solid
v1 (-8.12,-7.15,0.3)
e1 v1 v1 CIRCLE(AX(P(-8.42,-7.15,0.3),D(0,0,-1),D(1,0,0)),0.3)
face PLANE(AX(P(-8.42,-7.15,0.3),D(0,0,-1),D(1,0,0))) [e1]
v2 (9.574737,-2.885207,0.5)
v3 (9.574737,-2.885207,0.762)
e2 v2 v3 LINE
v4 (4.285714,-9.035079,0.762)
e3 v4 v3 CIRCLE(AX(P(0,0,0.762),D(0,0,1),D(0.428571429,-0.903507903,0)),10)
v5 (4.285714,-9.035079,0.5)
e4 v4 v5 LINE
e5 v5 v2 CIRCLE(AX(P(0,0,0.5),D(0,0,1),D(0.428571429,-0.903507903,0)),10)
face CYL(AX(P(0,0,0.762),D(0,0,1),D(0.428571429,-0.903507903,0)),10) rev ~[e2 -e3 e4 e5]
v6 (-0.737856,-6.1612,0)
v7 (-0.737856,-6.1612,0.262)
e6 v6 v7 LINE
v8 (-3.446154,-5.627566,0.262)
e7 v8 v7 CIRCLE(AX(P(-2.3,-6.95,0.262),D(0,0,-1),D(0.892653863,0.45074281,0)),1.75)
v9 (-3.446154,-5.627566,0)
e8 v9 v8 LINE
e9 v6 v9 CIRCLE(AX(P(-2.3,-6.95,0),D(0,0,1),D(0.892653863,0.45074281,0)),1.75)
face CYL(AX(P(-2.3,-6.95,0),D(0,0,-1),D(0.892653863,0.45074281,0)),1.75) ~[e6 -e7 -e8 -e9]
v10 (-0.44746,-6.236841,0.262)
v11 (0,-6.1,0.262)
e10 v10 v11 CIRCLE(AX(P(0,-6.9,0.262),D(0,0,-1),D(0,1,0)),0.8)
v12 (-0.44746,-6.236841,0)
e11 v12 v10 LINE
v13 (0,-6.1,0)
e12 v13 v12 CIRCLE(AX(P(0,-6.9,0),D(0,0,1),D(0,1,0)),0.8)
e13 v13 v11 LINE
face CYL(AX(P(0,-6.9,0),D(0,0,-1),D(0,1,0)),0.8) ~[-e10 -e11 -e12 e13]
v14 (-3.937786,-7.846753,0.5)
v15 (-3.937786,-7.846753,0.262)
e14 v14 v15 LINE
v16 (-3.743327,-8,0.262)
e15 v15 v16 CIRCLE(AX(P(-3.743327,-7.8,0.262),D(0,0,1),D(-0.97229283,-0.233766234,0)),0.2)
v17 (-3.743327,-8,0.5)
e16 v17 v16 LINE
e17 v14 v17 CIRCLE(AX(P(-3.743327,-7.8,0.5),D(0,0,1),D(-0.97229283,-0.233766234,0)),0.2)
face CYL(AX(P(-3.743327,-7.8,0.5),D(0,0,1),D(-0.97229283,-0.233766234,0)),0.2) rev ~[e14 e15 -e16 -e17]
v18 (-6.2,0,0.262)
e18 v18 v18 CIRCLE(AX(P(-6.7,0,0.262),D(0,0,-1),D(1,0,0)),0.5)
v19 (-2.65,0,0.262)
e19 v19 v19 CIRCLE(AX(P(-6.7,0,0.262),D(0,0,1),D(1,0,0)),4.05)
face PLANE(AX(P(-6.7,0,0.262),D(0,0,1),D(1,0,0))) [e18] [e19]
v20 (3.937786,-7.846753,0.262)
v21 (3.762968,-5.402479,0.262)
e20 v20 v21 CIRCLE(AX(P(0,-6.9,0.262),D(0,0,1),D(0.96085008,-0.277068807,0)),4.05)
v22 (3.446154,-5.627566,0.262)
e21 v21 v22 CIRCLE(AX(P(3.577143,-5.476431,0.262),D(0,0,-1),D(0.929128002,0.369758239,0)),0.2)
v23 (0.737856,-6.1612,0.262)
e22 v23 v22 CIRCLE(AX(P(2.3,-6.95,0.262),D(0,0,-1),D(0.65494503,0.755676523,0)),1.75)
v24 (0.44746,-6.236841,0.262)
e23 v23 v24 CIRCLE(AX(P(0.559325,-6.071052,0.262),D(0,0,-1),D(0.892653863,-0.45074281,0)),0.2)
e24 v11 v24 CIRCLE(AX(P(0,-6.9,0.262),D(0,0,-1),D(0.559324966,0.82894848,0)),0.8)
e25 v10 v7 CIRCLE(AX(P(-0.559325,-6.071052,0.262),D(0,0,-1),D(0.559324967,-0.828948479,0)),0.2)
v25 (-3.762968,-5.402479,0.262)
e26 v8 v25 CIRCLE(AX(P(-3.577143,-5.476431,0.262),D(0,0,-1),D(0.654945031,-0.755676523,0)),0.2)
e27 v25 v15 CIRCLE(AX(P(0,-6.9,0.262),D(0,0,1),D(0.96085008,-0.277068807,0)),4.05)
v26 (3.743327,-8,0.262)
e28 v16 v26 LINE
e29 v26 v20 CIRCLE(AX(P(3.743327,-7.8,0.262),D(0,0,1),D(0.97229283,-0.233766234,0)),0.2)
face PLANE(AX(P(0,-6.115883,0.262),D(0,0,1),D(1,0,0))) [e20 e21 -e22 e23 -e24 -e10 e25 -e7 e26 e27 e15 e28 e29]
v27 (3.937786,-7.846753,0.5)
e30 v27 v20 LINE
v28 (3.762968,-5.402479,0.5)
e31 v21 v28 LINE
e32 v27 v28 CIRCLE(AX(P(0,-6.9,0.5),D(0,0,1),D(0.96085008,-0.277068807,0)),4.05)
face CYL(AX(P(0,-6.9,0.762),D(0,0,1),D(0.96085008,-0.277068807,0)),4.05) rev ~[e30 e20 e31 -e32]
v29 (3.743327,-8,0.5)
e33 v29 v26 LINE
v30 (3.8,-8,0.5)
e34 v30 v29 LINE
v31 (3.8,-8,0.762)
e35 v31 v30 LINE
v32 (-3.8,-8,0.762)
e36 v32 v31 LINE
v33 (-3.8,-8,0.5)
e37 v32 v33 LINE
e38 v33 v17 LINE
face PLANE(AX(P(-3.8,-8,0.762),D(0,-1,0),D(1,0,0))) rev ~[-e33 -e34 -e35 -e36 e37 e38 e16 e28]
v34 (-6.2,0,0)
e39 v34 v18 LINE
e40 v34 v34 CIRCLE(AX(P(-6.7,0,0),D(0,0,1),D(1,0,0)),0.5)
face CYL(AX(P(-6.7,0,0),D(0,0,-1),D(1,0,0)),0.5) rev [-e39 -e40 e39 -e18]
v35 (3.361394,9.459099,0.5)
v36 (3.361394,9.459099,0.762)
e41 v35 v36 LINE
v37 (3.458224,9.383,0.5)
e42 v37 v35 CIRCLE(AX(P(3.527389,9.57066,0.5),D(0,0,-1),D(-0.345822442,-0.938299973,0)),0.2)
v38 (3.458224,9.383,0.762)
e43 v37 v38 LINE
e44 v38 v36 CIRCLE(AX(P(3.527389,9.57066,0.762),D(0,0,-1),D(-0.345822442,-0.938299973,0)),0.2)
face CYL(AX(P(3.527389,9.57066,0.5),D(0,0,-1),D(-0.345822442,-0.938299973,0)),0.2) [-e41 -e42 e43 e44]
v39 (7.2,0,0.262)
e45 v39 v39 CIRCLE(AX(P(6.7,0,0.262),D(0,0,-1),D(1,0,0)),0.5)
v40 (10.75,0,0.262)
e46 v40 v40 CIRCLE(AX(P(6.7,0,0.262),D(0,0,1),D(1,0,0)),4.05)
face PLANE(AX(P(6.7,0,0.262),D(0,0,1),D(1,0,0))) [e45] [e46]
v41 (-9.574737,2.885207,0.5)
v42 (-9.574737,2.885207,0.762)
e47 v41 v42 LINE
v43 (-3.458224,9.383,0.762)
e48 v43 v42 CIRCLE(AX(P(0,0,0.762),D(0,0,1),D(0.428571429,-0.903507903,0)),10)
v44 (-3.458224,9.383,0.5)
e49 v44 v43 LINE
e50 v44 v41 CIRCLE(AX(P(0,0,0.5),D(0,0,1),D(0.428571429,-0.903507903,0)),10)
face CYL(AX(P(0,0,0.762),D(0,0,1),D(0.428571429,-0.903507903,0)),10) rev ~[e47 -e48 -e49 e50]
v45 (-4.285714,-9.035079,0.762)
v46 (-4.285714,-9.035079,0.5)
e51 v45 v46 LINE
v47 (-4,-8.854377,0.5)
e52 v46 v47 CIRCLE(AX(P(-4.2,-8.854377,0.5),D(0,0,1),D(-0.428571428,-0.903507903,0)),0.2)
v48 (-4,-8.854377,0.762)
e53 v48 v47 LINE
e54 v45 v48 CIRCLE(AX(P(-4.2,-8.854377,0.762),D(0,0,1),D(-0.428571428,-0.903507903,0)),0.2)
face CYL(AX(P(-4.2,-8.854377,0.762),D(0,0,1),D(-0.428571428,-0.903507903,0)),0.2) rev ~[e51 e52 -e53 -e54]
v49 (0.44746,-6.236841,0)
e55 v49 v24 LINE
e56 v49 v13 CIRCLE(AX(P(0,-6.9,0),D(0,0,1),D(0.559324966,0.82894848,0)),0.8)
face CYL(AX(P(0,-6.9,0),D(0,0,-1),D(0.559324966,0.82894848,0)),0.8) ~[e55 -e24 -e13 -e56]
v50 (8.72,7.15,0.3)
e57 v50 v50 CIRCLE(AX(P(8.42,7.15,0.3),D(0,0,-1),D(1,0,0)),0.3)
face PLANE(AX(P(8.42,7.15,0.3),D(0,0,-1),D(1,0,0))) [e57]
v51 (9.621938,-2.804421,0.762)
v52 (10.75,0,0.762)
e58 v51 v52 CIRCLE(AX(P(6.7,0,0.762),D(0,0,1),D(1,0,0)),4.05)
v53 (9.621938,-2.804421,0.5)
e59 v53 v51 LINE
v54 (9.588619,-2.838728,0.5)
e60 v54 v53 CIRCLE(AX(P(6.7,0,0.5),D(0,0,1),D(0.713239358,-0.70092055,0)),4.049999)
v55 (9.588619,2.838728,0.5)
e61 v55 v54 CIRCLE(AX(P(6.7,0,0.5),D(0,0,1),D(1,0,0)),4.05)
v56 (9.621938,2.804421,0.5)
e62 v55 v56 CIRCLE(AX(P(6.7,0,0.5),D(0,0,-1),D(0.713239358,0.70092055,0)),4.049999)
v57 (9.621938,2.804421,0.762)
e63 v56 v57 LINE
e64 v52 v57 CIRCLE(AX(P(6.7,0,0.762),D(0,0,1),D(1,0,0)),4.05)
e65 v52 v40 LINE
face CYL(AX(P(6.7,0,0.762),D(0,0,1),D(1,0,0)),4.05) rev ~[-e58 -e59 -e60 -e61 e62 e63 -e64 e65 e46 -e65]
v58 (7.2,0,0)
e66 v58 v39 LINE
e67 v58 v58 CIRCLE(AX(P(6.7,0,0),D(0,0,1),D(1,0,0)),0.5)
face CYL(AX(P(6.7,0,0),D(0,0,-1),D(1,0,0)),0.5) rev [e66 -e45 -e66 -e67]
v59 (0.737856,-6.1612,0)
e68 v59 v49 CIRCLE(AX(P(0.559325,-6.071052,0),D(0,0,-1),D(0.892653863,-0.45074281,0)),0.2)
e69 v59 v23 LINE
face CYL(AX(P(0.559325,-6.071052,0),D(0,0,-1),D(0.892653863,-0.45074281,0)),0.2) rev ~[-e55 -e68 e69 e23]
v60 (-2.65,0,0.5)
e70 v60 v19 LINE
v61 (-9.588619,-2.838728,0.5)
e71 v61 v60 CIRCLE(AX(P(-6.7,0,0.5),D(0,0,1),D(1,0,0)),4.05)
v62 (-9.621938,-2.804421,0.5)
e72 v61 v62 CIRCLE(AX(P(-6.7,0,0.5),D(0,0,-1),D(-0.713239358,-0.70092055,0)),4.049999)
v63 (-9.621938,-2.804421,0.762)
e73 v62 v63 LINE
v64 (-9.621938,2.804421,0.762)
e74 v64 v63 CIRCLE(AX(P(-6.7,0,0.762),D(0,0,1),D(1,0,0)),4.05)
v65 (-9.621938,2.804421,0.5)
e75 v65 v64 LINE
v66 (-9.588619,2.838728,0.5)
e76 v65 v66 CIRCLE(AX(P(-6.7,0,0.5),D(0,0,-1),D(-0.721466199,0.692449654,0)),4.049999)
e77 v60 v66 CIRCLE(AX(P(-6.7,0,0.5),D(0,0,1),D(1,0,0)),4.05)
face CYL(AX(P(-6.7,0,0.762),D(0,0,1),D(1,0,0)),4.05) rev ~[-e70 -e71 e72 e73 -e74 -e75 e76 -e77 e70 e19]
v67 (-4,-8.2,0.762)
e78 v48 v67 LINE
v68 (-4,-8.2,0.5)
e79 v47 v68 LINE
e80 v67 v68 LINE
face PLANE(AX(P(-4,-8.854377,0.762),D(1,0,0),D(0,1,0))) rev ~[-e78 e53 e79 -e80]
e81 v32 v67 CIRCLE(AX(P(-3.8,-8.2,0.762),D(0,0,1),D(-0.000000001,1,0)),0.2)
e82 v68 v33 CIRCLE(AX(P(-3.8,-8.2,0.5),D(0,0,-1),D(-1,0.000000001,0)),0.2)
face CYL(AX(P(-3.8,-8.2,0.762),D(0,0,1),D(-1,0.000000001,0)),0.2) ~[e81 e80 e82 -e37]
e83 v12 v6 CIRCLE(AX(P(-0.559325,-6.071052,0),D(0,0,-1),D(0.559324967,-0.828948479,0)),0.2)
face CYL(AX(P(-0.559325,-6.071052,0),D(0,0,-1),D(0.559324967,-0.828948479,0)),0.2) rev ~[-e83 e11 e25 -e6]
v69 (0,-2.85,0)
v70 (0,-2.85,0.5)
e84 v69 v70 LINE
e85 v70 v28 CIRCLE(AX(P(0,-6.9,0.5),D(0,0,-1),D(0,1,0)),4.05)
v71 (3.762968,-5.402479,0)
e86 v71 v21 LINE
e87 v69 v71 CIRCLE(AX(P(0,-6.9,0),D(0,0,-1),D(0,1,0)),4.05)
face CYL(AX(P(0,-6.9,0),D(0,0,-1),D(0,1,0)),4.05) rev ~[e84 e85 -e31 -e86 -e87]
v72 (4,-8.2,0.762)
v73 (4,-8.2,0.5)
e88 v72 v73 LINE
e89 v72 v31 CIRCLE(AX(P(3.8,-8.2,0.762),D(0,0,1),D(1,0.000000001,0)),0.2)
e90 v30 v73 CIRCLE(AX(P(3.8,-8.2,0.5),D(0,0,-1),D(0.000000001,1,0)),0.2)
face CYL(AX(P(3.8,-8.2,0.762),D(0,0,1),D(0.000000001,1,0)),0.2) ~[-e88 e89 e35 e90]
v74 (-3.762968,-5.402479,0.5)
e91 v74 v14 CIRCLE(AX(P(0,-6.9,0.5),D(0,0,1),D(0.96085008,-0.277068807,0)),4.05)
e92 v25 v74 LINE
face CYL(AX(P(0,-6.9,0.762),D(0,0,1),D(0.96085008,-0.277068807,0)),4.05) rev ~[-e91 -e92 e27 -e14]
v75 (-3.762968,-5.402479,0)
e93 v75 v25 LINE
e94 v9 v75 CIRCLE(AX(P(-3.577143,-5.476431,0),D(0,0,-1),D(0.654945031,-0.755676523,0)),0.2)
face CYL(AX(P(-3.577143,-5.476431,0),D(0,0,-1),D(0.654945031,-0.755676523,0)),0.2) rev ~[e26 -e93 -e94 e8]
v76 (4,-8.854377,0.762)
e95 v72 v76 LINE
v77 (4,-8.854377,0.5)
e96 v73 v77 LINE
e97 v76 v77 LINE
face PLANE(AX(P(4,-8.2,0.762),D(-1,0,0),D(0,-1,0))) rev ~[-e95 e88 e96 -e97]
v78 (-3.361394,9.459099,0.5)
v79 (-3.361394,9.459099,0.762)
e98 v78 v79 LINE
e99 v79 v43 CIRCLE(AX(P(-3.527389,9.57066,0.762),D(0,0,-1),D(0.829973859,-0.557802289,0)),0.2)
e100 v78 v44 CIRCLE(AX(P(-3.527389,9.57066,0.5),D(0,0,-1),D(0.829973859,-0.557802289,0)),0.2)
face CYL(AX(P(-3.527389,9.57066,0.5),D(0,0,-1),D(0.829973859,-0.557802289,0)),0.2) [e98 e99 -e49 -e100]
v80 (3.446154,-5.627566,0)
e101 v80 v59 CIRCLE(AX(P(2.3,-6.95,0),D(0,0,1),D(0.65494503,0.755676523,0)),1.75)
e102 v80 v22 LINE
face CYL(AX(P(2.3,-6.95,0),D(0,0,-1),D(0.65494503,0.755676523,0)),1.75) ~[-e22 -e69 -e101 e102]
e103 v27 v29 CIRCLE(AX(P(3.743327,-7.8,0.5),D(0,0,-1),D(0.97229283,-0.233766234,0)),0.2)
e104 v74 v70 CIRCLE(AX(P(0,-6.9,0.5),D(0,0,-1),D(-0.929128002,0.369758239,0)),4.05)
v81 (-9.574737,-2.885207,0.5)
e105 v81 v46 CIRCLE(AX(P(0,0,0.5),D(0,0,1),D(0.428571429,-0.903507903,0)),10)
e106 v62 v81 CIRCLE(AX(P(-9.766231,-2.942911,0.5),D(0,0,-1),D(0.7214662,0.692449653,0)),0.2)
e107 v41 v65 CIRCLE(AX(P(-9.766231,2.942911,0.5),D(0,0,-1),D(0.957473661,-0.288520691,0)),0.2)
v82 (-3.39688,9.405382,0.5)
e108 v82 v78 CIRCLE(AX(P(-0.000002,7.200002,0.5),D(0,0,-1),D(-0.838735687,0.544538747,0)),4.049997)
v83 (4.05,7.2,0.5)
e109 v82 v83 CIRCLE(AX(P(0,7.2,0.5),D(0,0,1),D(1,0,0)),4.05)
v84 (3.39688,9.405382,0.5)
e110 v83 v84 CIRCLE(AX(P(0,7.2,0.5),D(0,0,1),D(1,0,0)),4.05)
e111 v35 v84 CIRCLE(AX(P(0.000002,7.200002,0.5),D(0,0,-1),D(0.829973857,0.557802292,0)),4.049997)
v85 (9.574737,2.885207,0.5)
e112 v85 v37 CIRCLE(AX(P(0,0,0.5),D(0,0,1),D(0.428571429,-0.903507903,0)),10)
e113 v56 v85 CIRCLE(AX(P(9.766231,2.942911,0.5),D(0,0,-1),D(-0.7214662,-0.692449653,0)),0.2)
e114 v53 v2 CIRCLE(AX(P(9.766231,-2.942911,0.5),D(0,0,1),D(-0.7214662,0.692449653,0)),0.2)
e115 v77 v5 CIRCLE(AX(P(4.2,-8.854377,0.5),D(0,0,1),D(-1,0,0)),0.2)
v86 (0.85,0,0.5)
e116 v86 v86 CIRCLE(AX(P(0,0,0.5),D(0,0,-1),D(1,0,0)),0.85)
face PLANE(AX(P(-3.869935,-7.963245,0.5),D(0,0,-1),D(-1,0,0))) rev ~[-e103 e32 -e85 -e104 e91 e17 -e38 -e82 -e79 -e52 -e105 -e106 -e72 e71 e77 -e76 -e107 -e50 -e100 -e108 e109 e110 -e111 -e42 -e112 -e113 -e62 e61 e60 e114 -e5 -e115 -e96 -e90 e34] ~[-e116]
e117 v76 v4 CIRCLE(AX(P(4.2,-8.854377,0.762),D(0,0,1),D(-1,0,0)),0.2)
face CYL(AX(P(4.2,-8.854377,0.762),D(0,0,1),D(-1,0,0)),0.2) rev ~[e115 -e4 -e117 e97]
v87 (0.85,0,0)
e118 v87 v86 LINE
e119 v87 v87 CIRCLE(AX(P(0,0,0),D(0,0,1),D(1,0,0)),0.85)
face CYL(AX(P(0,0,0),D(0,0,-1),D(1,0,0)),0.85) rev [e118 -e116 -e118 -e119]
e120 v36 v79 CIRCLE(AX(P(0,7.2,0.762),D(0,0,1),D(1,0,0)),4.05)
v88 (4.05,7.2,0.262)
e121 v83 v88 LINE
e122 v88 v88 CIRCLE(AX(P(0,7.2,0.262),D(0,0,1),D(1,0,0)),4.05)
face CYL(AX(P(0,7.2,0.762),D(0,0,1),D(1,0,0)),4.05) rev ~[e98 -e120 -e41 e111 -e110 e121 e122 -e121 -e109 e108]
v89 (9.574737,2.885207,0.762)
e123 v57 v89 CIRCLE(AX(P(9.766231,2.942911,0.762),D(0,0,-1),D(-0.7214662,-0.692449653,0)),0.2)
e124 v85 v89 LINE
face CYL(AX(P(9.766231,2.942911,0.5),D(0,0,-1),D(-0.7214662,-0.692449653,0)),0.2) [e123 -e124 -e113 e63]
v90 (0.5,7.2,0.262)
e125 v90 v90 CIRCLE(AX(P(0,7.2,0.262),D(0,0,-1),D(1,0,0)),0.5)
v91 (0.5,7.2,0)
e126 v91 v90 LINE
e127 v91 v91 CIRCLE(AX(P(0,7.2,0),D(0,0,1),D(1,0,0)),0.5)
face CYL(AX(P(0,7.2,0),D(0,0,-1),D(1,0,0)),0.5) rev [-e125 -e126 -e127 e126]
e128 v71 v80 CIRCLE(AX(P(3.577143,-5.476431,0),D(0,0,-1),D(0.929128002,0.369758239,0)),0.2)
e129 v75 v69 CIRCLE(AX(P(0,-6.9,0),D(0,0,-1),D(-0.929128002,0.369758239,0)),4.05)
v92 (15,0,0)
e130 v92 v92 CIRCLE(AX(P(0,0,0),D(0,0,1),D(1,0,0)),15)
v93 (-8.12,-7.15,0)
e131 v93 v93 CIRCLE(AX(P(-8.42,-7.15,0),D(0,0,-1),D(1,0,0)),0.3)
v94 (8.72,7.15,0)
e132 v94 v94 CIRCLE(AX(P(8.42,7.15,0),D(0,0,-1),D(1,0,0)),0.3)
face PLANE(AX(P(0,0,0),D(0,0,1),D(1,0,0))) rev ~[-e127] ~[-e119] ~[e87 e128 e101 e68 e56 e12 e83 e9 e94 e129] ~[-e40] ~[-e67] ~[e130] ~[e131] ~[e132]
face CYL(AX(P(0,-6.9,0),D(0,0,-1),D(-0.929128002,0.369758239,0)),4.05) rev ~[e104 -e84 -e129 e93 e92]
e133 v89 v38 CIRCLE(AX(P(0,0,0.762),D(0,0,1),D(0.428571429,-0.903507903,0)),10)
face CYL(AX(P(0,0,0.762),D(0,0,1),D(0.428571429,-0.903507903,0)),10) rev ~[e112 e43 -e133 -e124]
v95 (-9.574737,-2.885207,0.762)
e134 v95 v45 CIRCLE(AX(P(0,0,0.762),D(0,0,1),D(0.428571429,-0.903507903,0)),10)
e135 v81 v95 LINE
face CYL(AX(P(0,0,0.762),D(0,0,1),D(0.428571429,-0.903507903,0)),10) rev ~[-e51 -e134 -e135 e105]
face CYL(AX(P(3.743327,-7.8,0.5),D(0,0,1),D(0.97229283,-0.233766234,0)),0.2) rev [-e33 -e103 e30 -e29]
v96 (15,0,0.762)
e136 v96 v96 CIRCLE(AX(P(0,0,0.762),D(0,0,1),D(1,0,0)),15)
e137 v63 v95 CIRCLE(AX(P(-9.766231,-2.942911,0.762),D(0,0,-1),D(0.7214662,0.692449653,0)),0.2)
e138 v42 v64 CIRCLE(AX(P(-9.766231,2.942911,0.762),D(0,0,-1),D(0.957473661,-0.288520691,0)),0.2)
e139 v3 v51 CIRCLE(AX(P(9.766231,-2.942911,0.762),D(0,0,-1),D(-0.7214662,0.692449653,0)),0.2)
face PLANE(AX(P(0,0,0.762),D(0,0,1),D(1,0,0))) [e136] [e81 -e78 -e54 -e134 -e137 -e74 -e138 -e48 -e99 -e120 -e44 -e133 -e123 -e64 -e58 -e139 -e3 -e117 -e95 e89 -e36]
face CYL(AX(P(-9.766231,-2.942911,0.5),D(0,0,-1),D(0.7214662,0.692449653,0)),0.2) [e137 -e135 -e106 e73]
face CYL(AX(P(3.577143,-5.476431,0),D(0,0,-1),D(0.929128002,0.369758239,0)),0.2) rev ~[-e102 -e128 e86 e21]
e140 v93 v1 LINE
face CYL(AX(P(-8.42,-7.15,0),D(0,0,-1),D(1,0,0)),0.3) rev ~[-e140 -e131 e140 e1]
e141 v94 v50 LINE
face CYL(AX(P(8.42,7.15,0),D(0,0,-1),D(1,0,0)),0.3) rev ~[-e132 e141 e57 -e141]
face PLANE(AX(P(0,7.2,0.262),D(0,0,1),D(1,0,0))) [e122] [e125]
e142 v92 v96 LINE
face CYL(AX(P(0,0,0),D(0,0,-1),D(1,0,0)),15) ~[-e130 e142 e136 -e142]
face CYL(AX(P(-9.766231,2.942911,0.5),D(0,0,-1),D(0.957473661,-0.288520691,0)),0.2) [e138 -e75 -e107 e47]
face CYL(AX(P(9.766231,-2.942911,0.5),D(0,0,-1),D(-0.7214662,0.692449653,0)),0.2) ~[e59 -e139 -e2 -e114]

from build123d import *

# Parameters (mm, degrees)
F0_R         = 15
F0_R_2       = 0.5
F0_R_3       = 0.85
F1_DEPTH     = 0.762
F3_DEPTH     = 0.262
F4_R         = 4.05
F5_DEPTH     = 0.5
F6_T4_DEPTH  = 0.6914880487
F6_T9_DEPTH  = 0.6914880487
F6_T11_DEPTH = 0.3832692911
F6_T13_DEPTH = 0.4252513356
F7_R         = 0.3
F8_DEPTH     = 0.3


# Not quite as in the source:
# - a fillet or chamfer that OpenCascade refuses, or shapes differently, is made with other operations: its cross-section is extruded or revolved along the edge and cut away or added


with BuildPart() as f1:
    # F0 (on Top) → F1 (new body)
    with BuildSketch(Plane.XY):
        Circle(F0_R)
        with BuildLine():
            ThreePointArc((-3.7629684096, -5.4024791326), (-2.2734929609, -3.548324336), (0, -2.85))
            ThreePointArc((0, -2.85), (2.2734929609, -3.548324336), (3.7629684096, -5.4024791326))
            ThreePointArc((3.7629684096, -5.4024791326), (3.6929780242, -5.6394712752), (3.4461538031, -5.6275660849))
            ThreePointArc((3.4461538031, -5.6275660849), (1.9616904878, -5.2330123256), (0.7378557396, -6.1612000827))
            ThreePointArc((0.7378557396, -6.1612000827), (0.6097380289, -6.2645935657), (0.4474599736, -6.2368412165))
            ThreePointArc((0.4474599736, -6.2368412165), (0.233958301, -6.1349748283), (0, -6.1))
            ThreePointArc((0, -6.1), (-0.233958301, -6.1349748283), (-0.4474599736, -6.2368412165))
            ThreePointArc((-0.4474599736, -6.2368412165), (-0.6097380289, -6.2645935657), (-0.7378557396, -6.1612000827))
            ThreePointArc((-0.7378557396, -6.1612000827), (-1.9616904878, -5.2330123256), (-3.4461538031, -5.6275660849))
            ThreePointArc((-3.4461538031, -5.6275660849), (-3.6929780242, -5.6394712752), (-3.7629684096, -5.4024791326))
        make_face(mode=Mode.SUBTRACT)
        with Locations((-6.7, 0)):
            Circle(F0_R_2, mode=Mode.SUBTRACT)
        Circle(F0_R_3, mode=Mode.SUBTRACT)
        with Locations((6.7, 0)):
            Circle(F0_R_2, mode=Mode.SUBTRACT)
        with Locations((0, 7.2)):
            Circle(F0_R_2, mode=Mode.SUBTRACT)
    extrude(amount=F1_DEPTH)

    # F2 (on face) → F3 (cut)
    with BuildSketch(Plane.XY.offset(0.762)):
        with BuildLine():
            ThreePointArc((4, -8.8543774485), (4.0930955032, -9.0234082994), (4.2857142857, -9.0350790291))
            ThreePointArc((4.2857142857, -9.0350790291), (0, 10), (-4.2857142857, -9.0350790291))
            ThreePointArc((-4.2857142857, -9.0350790291), (-4.0930955032, -9.0234082994), (-4, -8.8543774485))
            Line((-4, -8.8543774485), (-4, -8.2))
            ThreePointArc((-4, -8.2), (-3.9414213562, -8.0585786438), (-3.8, -8))
            Line((-3.8, -8), (0, -8))
            Line((0, -8), (3.8, -8))
            ThreePointArc((3.8, -8), (3.9414213562, -8.0585786438), (4, -8.2))
            Line((4, -8.2), (4, -8.8543774485))
        make_face()
    extrude(amount=-F3_DEPTH, mode=Mode.SUBTRACT)

    # F4 (on face) → F5 (cut)
    with BuildSketch(Plane.XY.offset(0.762)):
        with Locations((0, 7.2)):
            Circle(F4_R)
        with Locations((6.7, 0)):
            Circle(F4_R)
        with Locations((-6.7, 0)):
            Circle(F4_R)
        with BuildLine():
            ThreePointArc((3.8, -8), (3.8470411203, -8.0056108722), (3.8914428234, -8.02212867))
            ThreePointArc((3.8914428234, -8.02212867), (0, -2.85), (-3.8914428234, -8.02212867))
            ThreePointArc((-3.8914428234, -8.02212867), (-3.8470411203, -8.0056108722), (-3.8, -8))
            Line((-3.8, -8), (3.8, -8))
        make_face()
    extrude(amount=-F5_DEPTH, mode=Mode.SUBTRACT)

    # F6: fillet of radius 0.2 on 8 edges, made by hand


with BuildPart() as f6_tool2:
    # F6_s3 → F6_t4 (new body)
    with BuildSketch(Plane.XY.offset(0.5)):
        with BuildLine():
            ThreePointArc((3.9377859629, -7.8467532468), (3.8671202695, -7.9570838142), (3.7433273968, -8))
            Line((3.7433273968, -8), (3.7433273968, -8.02))
            ThreePointArc((3.7433273968, -8.02), (3.8, -8.02), (3.8822985411, -8.039915803))
            Line((3.8822985411, -8.039915803), (3.910659825, -8.0276700461))
            ThreePointArc((3.910659825, -8.0276700461), (3.9349326547, -7.9398100803), (3.9572318195, -7.8514285714))
            Line((3.9572318195, -7.8514285714), (3.9377859629, -7.8467532468))
        make_face()
    extrude(amount=-F6_T4_DEPTH)

    split(bisect_by=Plane.XY, keep=Keep.TOP)


with BuildPart() as f1_1:
    add(f1.part)

    # F6_t1: union F6_tool2
    add(f6_tool2.part)


with BuildPart() as f6_tool7:
    # F6_s8 → F6_t9 (new body)
    with BuildSketch(Plane.XY.offset(0.5)):
        with BuildLine():
            ThreePointArc((-3.9377859629, -7.8467532468), (-3.8671202695, -7.9570838142), (-3.7433273968, -8))
            Line((-3.7433273968, -8), (-3.7433273968, -8.02))
            ThreePointArc((-3.7433273968, -8.02), (-3.8, -8.02), (-3.8822985411, -8.039915803))
            Line((-3.8822985411, -8.039915803), (-3.910659825, -8.0276700461))
            ThreePointArc((-3.910659825, -8.0276700461), (-3.9349326547, -7.9398100803), (-3.9572318195, -7.8514285714))
            Line((-3.9572318195, -7.8514285714), (-3.9377859629, -7.8467532468))
        make_face()
    extrude(amount=-F6_T9_DEPTH)

    split(bisect_by=Plane.XY, keep=Keep.TOP)


with BuildPart() as f1_2:
    add(f1_1.part)

    # F6_t6: union F6_tool7
    add(f6_tool7.part)

    # F6_s12 → F6_t11 (cut)
    with BuildSketch(Plane.XY.offset(0.5)):
        with BuildLine():
            ThreePointArc((-9.5747366111, 2.8852068953), (-9.5935467273, 2.8420149313), (-9.6219381036, 2.8044211022))
            ThreePointArc((-9.6219381036, 2.8044211022), (-9.6053293925, 2.8216238447), (-9.588619403, 2.8387282266))
            ThreePointArc((-9.588619403, 2.8387282266), (-9.5817061892, 2.8619759788), (-9.5747366111, 2.8852068953))
        make_face()
        with BuildLine():
            ThreePointArc((-9.6219381036, -2.8044211022), (-9.5935467273, -2.8420149313), (-9.5747366111, -2.8852068953))
            ThreePointArc((-9.5747366111, -2.8852068953), (-9.5817061892, -2.8619759788), (-9.588619403, -2.8387282266))
            ThreePointArc((-9.588619403, -2.8387282266), (-9.6053293925, -2.8216238447), (-9.6219381036, -2.8044211022))
        make_face()
        with BuildLine():
            ThreePointArc((9.6219381036, 2.8044211022), (9.5935467273, 2.8420149313), (9.5747366111, 2.8852068953))
            ThreePointArc((9.5747366111, 2.8852068953), (9.5817061892, 2.8619759788), (9.588619403, 2.8387282266))
            ThreePointArc((9.588619403, 2.8387282266), (9.6053293925, 2.8216238447), (9.6219381036, 2.8044211022))
        make_face()
        with BuildLine():
            ThreePointArc((9.6219381036, -2.8044211022), (9.5935467273, -2.8420149313), (9.5747366111, -2.8852068953))
            ThreePointArc((9.5747366111, -2.8852068953), (9.5817061892, -2.8619759788), (9.588619403, -2.8387282266))
            ThreePointArc((9.588619403, -2.8387282266), (9.6053293925, -2.8216238447), (9.6219381036, -2.8044211022))
        make_face()
    extrude(amount=F6_T11_DEPTH, mode=Mode.SUBTRACT)

    # F6_s14 → F6_t13 (cut)
    with BuildSketch(Plane.XY.offset(0.5)):
        with BuildLine():
            ThreePointArc((3.4582244159, 9.3829997277), (3.4038059187, 9.4134107296), (3.3613941322, 9.4590992647))
            ThreePointArc((3.3613941322, 9.4590992647), (3.3792435663, 9.4323111163), (3.3968795208, 9.4053819444))
            ThreePointArc((3.3968795208, 9.4053819444), (3.427570238, 9.3942409094), (3.4582244159, 9.3829997277))
        make_face()
        with BuildLine():
            ThreePointArc((-3.3613941322, 9.4590992647), (-3.4038059187, 9.4134107296), (-3.4582244159, 9.3829997277))
            ThreePointArc((-3.4582244159, 9.3829997277), (-3.427570238, 9.3942409094), (-3.3968795208, 9.4053819444))
            ThreePointArc((-3.3968795208, 9.4053819444), (-3.3792435663, 9.4323111163), (-3.3613941322, 9.4590992647))
        make_face()
    extrude(amount=F6_T13_DEPTH, mode=Mode.SUBTRACT)

    # F7 (on face) → F8 (cut)
    with BuildSketch(Plane(origin=(0, 0, 0), x_dir=(1, 0, 0), z_dir=(0, 0, -1))):
        with Locations((8.42, -7.15)):
            Circle(F7_R)
        with Locations((-8.42, 7.15)):
            Circle(F7_R)
    extrude(amount=-F8_DEPTH, mode=Mode.SUBTRACT)


solid = f1_2.part
